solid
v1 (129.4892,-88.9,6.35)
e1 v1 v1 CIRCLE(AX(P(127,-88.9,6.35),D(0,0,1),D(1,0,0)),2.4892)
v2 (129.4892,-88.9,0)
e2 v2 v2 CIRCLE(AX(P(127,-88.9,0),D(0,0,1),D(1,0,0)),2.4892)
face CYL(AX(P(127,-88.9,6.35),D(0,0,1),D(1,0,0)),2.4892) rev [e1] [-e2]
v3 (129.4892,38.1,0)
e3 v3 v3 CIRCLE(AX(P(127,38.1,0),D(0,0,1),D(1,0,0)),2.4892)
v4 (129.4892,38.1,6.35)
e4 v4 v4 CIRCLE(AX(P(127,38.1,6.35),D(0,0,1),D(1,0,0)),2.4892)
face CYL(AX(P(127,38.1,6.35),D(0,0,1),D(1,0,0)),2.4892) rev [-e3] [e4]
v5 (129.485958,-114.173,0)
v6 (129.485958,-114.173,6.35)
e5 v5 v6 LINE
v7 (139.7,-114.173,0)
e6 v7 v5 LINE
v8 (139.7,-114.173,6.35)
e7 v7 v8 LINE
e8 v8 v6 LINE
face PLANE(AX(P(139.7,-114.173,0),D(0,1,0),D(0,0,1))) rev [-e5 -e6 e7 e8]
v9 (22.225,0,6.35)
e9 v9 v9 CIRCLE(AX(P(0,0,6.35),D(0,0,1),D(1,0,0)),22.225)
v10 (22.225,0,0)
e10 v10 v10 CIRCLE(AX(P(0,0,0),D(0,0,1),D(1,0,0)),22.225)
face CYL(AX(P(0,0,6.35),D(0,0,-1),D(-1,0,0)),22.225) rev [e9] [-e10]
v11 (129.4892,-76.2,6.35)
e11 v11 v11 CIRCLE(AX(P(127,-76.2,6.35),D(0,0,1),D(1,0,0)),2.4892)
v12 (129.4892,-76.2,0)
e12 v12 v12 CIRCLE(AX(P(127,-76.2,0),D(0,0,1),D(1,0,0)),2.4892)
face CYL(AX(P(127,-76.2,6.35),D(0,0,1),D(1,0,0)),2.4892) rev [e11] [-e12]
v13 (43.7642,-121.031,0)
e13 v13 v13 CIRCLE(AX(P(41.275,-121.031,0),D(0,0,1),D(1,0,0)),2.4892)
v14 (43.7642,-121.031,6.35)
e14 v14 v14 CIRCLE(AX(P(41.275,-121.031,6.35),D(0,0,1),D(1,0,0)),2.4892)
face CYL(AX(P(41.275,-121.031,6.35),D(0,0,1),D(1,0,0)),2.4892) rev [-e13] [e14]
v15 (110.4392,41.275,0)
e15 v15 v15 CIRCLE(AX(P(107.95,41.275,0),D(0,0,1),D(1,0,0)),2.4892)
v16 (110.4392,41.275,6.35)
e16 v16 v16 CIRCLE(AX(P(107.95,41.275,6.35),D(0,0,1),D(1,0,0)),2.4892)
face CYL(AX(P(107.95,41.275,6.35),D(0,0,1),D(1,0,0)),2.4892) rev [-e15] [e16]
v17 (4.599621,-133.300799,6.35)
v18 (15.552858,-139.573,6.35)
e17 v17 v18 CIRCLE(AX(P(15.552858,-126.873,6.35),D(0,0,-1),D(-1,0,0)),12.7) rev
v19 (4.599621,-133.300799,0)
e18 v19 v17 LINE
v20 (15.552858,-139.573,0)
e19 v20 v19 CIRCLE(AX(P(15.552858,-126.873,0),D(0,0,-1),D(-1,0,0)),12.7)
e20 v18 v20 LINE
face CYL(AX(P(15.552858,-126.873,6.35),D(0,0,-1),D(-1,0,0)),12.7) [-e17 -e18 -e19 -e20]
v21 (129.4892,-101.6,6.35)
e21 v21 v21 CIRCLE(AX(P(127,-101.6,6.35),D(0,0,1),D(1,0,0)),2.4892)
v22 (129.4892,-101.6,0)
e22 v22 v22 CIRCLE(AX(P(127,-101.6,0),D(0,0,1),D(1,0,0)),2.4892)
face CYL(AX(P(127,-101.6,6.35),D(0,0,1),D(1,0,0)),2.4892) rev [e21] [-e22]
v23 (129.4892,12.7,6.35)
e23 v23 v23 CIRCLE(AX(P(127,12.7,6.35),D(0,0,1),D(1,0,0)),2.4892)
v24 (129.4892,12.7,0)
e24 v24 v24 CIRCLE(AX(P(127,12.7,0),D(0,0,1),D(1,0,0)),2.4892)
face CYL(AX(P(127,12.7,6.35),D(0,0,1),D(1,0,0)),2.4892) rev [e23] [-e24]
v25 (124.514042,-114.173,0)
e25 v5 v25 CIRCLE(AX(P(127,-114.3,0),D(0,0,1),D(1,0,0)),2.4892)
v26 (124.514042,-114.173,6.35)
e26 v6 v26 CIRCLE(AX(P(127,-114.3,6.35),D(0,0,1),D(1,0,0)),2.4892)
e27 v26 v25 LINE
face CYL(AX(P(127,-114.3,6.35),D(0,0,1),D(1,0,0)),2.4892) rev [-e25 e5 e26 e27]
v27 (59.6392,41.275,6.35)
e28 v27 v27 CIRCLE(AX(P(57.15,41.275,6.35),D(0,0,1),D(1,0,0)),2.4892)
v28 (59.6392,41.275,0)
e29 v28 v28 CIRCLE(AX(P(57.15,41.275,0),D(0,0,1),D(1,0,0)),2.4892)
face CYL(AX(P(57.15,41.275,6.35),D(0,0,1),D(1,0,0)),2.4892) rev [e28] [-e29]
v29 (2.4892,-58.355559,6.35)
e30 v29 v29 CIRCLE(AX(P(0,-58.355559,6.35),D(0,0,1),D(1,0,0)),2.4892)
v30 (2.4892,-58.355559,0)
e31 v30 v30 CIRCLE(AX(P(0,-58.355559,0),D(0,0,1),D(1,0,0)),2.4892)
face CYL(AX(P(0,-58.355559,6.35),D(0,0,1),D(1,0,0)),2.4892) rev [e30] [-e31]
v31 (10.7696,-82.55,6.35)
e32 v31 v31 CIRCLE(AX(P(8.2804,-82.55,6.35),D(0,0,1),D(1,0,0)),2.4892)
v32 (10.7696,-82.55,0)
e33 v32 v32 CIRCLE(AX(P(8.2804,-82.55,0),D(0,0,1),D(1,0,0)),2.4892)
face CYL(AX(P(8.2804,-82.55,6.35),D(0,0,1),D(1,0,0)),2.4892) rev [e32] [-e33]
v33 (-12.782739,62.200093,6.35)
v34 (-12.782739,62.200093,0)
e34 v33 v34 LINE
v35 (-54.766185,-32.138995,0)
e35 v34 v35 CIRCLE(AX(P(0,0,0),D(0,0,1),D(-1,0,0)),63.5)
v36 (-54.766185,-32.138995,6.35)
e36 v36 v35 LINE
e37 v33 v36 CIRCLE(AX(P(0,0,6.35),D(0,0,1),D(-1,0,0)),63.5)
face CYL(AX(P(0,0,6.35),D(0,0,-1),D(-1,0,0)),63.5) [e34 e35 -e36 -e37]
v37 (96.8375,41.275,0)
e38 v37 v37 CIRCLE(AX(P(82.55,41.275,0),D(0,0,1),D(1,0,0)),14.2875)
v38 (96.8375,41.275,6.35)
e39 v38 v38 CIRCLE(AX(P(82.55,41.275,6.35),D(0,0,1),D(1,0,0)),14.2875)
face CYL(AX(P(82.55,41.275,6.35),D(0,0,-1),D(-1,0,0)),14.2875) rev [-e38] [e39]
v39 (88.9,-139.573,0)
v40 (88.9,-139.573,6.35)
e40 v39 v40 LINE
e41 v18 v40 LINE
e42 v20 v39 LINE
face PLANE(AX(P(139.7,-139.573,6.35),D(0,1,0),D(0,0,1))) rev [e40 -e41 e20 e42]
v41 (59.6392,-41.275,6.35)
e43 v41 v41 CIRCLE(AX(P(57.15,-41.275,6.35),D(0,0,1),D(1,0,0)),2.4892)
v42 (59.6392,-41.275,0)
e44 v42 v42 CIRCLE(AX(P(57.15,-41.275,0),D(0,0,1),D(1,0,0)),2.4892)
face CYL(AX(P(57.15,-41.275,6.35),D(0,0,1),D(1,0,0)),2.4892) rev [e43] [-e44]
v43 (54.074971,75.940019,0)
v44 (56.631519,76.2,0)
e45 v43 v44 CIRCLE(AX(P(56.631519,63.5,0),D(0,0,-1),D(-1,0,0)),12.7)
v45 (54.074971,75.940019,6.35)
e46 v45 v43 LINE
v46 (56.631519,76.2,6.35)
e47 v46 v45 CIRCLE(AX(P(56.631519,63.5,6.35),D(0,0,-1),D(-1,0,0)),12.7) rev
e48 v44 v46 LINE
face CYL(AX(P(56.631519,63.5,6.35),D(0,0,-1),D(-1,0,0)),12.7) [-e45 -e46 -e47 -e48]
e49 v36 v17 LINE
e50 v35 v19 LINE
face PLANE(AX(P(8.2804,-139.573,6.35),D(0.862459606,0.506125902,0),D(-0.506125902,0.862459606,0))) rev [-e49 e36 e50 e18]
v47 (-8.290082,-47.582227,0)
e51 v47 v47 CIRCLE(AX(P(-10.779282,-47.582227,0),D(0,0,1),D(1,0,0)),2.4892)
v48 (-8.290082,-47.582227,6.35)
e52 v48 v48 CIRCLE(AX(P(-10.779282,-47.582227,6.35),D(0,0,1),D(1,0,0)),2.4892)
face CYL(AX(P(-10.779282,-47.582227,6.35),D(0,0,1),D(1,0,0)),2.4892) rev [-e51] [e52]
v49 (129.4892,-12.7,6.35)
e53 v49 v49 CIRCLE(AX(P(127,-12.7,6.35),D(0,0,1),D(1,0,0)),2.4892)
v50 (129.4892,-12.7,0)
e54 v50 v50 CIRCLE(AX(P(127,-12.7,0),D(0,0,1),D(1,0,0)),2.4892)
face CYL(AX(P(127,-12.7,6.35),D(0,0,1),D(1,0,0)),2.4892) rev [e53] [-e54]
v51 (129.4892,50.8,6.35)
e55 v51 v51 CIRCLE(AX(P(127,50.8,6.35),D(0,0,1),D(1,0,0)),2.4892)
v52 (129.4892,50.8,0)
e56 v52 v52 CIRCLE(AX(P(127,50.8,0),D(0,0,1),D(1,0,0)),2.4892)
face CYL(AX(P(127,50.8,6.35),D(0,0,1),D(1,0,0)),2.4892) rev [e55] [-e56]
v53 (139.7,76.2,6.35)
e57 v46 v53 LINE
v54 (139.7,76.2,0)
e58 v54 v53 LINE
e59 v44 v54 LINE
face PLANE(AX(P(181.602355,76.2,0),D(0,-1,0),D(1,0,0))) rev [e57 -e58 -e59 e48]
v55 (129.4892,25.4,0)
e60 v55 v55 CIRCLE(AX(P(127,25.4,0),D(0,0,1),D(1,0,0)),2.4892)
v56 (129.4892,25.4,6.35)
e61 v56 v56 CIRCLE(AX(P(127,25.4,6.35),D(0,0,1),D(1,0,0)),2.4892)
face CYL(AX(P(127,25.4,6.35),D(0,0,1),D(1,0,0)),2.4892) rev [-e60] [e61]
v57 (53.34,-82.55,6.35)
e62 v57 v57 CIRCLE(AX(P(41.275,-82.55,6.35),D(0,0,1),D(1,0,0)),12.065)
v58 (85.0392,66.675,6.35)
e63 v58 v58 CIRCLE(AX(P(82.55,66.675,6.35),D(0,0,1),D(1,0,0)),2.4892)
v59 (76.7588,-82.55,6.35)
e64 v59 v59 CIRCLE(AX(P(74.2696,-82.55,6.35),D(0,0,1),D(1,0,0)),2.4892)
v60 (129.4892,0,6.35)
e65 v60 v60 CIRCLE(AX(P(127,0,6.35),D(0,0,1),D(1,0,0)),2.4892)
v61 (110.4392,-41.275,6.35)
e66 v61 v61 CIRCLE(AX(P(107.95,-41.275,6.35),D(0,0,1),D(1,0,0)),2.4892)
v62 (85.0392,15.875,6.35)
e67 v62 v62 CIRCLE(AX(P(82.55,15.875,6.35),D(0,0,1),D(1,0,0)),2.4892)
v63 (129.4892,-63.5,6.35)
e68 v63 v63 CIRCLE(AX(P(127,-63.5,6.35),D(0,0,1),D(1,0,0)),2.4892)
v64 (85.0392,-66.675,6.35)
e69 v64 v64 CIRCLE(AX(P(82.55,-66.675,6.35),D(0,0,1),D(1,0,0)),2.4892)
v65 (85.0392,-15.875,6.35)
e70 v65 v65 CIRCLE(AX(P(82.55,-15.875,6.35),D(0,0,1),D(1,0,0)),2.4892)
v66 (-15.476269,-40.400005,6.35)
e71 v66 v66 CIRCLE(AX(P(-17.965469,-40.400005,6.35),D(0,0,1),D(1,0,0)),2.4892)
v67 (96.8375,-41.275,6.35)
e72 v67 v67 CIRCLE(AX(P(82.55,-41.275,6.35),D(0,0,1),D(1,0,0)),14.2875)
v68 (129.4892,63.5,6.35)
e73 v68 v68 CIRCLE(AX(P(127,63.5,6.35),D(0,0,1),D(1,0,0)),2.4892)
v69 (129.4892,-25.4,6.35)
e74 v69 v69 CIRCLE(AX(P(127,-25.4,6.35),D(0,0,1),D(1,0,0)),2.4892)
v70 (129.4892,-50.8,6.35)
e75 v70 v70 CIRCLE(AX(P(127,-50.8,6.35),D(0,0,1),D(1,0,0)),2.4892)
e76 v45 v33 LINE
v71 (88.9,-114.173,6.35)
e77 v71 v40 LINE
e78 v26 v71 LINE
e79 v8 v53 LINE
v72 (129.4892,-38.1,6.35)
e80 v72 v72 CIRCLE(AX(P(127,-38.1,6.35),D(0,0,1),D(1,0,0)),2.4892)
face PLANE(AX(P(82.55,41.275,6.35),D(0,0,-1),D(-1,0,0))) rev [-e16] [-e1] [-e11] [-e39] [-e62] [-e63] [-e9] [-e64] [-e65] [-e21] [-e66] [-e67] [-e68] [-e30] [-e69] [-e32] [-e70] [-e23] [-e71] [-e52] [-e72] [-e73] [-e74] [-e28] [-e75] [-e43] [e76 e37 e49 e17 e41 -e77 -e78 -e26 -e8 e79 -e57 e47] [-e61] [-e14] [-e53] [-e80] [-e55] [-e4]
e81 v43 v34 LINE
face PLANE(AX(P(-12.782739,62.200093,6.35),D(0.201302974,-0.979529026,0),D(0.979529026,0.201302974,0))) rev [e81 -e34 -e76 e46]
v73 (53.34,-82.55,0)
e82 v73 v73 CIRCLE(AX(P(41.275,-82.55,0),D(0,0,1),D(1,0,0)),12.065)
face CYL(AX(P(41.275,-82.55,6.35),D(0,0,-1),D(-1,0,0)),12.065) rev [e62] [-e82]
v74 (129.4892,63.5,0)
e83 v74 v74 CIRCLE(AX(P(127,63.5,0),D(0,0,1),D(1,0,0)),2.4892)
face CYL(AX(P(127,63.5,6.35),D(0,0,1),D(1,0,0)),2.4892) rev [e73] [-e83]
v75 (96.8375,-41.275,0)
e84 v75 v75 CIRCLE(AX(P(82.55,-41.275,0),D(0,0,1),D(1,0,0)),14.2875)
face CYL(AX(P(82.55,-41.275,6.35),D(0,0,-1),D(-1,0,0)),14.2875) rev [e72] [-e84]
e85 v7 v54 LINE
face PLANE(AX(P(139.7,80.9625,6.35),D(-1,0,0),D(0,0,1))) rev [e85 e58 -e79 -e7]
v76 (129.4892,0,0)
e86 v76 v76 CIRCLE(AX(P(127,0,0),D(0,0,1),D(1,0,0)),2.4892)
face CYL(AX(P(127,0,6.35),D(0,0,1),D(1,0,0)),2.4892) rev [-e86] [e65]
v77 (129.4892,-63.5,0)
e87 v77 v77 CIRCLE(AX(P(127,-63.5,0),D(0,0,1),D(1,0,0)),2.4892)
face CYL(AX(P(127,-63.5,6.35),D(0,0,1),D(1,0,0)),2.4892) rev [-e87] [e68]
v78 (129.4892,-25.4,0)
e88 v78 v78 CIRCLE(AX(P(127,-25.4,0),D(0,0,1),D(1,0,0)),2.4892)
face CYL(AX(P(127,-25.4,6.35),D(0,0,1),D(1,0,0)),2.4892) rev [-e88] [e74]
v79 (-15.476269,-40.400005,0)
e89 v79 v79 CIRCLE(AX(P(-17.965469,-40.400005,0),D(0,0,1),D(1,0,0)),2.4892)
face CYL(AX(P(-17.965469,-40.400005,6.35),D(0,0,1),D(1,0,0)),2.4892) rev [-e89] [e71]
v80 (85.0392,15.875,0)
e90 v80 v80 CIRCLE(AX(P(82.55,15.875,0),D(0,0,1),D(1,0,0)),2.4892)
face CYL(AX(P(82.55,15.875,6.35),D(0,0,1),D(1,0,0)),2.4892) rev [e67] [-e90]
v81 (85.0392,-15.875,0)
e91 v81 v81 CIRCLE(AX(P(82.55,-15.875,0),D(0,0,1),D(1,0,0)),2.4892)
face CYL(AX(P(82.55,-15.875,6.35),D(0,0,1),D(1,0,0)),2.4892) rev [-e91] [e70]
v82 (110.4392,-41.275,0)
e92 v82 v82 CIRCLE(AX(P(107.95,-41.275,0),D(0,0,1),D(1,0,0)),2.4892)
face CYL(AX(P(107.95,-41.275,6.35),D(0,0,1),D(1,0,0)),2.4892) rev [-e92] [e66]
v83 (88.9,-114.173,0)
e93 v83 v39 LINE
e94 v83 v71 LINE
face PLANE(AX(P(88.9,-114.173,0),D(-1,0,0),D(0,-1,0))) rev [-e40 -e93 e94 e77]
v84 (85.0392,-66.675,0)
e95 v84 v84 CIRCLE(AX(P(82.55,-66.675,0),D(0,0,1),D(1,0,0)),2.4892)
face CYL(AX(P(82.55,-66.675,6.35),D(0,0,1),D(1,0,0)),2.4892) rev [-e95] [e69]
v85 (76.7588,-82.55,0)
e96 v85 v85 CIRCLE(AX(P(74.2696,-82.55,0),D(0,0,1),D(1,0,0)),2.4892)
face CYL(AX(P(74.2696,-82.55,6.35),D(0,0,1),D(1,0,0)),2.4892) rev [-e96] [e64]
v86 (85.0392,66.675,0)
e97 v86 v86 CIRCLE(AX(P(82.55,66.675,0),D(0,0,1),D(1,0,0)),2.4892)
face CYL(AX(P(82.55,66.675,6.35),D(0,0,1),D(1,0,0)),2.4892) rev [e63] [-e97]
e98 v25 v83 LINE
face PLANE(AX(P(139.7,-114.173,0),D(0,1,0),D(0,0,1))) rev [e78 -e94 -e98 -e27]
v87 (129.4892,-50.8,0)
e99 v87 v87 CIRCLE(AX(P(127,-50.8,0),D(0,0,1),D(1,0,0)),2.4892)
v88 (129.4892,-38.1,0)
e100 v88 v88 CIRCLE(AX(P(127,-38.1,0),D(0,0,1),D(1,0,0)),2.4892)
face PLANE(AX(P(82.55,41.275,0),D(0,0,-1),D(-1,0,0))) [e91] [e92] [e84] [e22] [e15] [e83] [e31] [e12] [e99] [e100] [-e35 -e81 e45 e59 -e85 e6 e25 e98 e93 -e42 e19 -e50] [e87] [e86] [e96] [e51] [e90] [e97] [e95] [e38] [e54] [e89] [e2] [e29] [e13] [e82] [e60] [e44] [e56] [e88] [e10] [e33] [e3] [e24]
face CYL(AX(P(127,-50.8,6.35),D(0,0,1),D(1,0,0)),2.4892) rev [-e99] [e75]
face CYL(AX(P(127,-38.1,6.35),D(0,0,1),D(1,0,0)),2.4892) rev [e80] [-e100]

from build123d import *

# Parameters (mm, degrees)
SKETCH1_R                          = 22.225
SKETCH1_R_2                        = 14.2875
SKETCH1_R_3                        = 12.065
BOSS_EXTRUDE1_DEPTH                = 6.35
F_9_0_196_DIAMETER_HOLE1_OUTLINE_R = 2.4892
F_9_0_196_DIAMETER_HOLE1_DEPTH     = 6.35
SKETCH5_W                          = 158.475738421
SKETCH5_H                          = 23.945509926
CUT_EXTRUDE1_DEPTH                 = 198.577920905
FILLET1_R                          = 12.7
SKETCH9_W                          = 50.8
SKETCH9_H                          = 25.4
CUT_EXTRUDE2_DEPTH                 = 198.577920905


# Read off the part's stored shape, not the designer's step: #9 (0.196) Diameter Hole1
with BuildPart() as part:
    # Sketch1 → Boss-Extrude1 (new body)
    with BuildSketch(Plane(origin=(0, 0, 0), x_dir=(0, 1, 0), z_dir=(0, 0, 1))):
        with BuildLine():
            Line((80.9625, -82.55), (80.9625, -139.7))
            Line((80.9625, -139.7), (-139.573, -139.7))
            Line((-139.573, -139.7), (-139.573, -8.2804))
            Line((-139.573, -8.2804), (-32.138994776, 54.766184957))
            ThreePointArc((-32.138994776, 54.766184957), (25.818013961, 58.014482288), (62.200093141, 12.782738878))
            Line((62.200093141, 12.782738878), (80.150058213, -74.560788201))
            ThreePointArc((80.150058213, -74.560788201), (80.758867143, -78.534792445), (80.9625, -82.55))
        make_face()
        with Locations(Location((0, 0, 0), (0, 0, 270))):
            Circle(SKETCH1_R, mode=Mode.SUBTRACT)
        with Locations(Location((-41.275, -82.55, 0), (0, 0, 270))):
            Circle(SKETCH1_R_2, mode=Mode.SUBTRACT)
        with Locations(Location((41.275, -82.55, 0), (0, 0, 270))):
            Circle(SKETCH1_R_2, mode=Mode.SUBTRACT)
        with Locations(Location((-82.55, -41.275, 0), (0, 0, 270))):
            Circle(SKETCH1_R_3, mode=Mode.SUBTRACT)
    extrude(amount=BOSS_EXTRUDE1_DEPTH)

    # #9 (0.196) Diameter Hole1 outline → #9 (0.196) Diameter Hole1 (cut)
    with BuildSketch(Plane.XY):
        with Locations((101.6, -127)):
            Circle(F_9_0_196_DIAMETER_HOLE1_OUTLINE_R)
        with Locations((114.3, -127)):
            Circle(F_9_0_196_DIAMETER_HOLE1_OUTLINE_R)
        with Locations((127, 63.5)):
            Circle(F_9_0_196_DIAMETER_HOLE1_OUTLINE_R)
        with Locations((127, 50.8)):
            Circle(F_9_0_196_DIAMETER_HOLE1_OUTLINE_R)
        with Locations((127, 38.1)):
            Circle(F_9_0_196_DIAMETER_HOLE1_OUTLINE_R)
        with Locations((127, 25.4)):
            Circle(F_9_0_196_DIAMETER_HOLE1_OUTLINE_R)
        with Locations((127, 12.7)):
            Circle(F_9_0_196_DIAMETER_HOLE1_OUTLINE_R)
        with Locations((127, 0)):
            Circle(F_9_0_196_DIAMETER_HOLE1_OUTLINE_R)
        with Locations((8.2804, -82.55)):
            Circle(F_9_0_196_DIAMETER_HOLE1_OUTLINE_R)
        with Locations((41.275, -121.031)):
            Circle(F_9_0_196_DIAMETER_HOLE1_OUTLINE_R)
        with Locations((74.2696, -82.55)):
            Circle(F_9_0_196_DIAMETER_HOLE1_OUTLINE_R)
        with Locations((0, -58.355558977)):
            Circle(F_9_0_196_DIAMETER_HOLE1_OUTLINE_R)
        with Locations((-10.779281546, -47.582226654)):
            Circle(F_9_0_196_DIAMETER_HOLE1_OUTLINE_R)
        with Locations((-17.965469244, -40.400005105)):
            Circle(F_9_0_196_DIAMETER_HOLE1_OUTLINE_R)
        with Locations((127, -12.7)):
            Circle(F_9_0_196_DIAMETER_HOLE1_OUTLINE_R)
        with Locations((127, -25.4)):
            Circle(F_9_0_196_DIAMETER_HOLE1_OUTLINE_R)
        with Locations((127, -38.1)):
            Circle(F_9_0_196_DIAMETER_HOLE1_OUTLINE_R)
        with Locations((127, -50.8)):
            Circle(F_9_0_196_DIAMETER_HOLE1_OUTLINE_R)
        with Locations((127, -63.5)):
            Circle(F_9_0_196_DIAMETER_HOLE1_OUTLINE_R)
        with Locations((127, -76.2)):
            Circle(F_9_0_196_DIAMETER_HOLE1_OUTLINE_R)
        with Locations((127, -88.9)):
            Circle(F_9_0_196_DIAMETER_HOLE1_OUTLINE_R)
        with Locations((127, -101.6)):
            Circle(F_9_0_196_DIAMETER_HOLE1_OUTLINE_R)
        with Locations((127, -114.3)):
            Circle(F_9_0_196_DIAMETER_HOLE1_OUTLINE_R)
        with Locations((127, -127)):
            Circle(F_9_0_196_DIAMETER_HOLE1_OUTLINE_R)
        with Locations((107.95, -41.275)):
            Circle(F_9_0_196_DIAMETER_HOLE1_OUTLINE_R)
        with Locations((82.55, -66.675)):
            Circle(F_9_0_196_DIAMETER_HOLE1_OUTLINE_R)
        with Locations((57.15, -41.275)):
            Circle(F_9_0_196_DIAMETER_HOLE1_OUTLINE_R)
        with Locations((82.55, -15.875)):
            Circle(F_9_0_196_DIAMETER_HOLE1_OUTLINE_R)
        with Locations((82.55, 15.875)):
            Circle(F_9_0_196_DIAMETER_HOLE1_OUTLINE_R)
        with Locations((107.95, 41.275)):
            Circle(F_9_0_196_DIAMETER_HOLE1_OUTLINE_R)
        with Locations((82.55, 66.675)):
            Circle(F_9_0_196_DIAMETER_HOLE1_OUTLINE_R)
        with Locations((57.15, 41.275)):
            Circle(F_9_0_196_DIAMETER_HOLE1_OUTLINE_R)
    extrude(amount=F_9_0_196_DIAMETER_HOLE1_DEPTH, mode=Mode.SUBTRACT)

    # Sketch5 → Cut-Extrude1 (cut, through all)
    with BuildSketch(Plane.XY.offset(6.35)):
        with Locations((102.364485766, 88.172754963)):
            Rectangle(SKETCH5_W, SKETCH5_H)
    extrude(amount=-CUT_EXTRUDE1_DEPTH, mode=Mode.SUBTRACT)

    # Fillet1
    fillet1_edges = [part.edges().sort_by_distance(p)[0] for p in [
        (8.2804, -139.573, 3.175),
        (55.340025647, 76.2, 3.175),
    ]]
    fillet(fillet1_edges, radius=FILLET1_R)

    # Sketch9 → Cut-Extrude2 (cut, through all)
    with BuildSketch(Plane.XY.offset(6.35)):
        with Locations((114.3, -126.873)):
            Rectangle(SKETCH9_W, SKETCH9_H)
    extrude(amount=-CUT_EXTRUDE2_DEPTH, mode=Mode.SUBTRACT)


solid = part.part
